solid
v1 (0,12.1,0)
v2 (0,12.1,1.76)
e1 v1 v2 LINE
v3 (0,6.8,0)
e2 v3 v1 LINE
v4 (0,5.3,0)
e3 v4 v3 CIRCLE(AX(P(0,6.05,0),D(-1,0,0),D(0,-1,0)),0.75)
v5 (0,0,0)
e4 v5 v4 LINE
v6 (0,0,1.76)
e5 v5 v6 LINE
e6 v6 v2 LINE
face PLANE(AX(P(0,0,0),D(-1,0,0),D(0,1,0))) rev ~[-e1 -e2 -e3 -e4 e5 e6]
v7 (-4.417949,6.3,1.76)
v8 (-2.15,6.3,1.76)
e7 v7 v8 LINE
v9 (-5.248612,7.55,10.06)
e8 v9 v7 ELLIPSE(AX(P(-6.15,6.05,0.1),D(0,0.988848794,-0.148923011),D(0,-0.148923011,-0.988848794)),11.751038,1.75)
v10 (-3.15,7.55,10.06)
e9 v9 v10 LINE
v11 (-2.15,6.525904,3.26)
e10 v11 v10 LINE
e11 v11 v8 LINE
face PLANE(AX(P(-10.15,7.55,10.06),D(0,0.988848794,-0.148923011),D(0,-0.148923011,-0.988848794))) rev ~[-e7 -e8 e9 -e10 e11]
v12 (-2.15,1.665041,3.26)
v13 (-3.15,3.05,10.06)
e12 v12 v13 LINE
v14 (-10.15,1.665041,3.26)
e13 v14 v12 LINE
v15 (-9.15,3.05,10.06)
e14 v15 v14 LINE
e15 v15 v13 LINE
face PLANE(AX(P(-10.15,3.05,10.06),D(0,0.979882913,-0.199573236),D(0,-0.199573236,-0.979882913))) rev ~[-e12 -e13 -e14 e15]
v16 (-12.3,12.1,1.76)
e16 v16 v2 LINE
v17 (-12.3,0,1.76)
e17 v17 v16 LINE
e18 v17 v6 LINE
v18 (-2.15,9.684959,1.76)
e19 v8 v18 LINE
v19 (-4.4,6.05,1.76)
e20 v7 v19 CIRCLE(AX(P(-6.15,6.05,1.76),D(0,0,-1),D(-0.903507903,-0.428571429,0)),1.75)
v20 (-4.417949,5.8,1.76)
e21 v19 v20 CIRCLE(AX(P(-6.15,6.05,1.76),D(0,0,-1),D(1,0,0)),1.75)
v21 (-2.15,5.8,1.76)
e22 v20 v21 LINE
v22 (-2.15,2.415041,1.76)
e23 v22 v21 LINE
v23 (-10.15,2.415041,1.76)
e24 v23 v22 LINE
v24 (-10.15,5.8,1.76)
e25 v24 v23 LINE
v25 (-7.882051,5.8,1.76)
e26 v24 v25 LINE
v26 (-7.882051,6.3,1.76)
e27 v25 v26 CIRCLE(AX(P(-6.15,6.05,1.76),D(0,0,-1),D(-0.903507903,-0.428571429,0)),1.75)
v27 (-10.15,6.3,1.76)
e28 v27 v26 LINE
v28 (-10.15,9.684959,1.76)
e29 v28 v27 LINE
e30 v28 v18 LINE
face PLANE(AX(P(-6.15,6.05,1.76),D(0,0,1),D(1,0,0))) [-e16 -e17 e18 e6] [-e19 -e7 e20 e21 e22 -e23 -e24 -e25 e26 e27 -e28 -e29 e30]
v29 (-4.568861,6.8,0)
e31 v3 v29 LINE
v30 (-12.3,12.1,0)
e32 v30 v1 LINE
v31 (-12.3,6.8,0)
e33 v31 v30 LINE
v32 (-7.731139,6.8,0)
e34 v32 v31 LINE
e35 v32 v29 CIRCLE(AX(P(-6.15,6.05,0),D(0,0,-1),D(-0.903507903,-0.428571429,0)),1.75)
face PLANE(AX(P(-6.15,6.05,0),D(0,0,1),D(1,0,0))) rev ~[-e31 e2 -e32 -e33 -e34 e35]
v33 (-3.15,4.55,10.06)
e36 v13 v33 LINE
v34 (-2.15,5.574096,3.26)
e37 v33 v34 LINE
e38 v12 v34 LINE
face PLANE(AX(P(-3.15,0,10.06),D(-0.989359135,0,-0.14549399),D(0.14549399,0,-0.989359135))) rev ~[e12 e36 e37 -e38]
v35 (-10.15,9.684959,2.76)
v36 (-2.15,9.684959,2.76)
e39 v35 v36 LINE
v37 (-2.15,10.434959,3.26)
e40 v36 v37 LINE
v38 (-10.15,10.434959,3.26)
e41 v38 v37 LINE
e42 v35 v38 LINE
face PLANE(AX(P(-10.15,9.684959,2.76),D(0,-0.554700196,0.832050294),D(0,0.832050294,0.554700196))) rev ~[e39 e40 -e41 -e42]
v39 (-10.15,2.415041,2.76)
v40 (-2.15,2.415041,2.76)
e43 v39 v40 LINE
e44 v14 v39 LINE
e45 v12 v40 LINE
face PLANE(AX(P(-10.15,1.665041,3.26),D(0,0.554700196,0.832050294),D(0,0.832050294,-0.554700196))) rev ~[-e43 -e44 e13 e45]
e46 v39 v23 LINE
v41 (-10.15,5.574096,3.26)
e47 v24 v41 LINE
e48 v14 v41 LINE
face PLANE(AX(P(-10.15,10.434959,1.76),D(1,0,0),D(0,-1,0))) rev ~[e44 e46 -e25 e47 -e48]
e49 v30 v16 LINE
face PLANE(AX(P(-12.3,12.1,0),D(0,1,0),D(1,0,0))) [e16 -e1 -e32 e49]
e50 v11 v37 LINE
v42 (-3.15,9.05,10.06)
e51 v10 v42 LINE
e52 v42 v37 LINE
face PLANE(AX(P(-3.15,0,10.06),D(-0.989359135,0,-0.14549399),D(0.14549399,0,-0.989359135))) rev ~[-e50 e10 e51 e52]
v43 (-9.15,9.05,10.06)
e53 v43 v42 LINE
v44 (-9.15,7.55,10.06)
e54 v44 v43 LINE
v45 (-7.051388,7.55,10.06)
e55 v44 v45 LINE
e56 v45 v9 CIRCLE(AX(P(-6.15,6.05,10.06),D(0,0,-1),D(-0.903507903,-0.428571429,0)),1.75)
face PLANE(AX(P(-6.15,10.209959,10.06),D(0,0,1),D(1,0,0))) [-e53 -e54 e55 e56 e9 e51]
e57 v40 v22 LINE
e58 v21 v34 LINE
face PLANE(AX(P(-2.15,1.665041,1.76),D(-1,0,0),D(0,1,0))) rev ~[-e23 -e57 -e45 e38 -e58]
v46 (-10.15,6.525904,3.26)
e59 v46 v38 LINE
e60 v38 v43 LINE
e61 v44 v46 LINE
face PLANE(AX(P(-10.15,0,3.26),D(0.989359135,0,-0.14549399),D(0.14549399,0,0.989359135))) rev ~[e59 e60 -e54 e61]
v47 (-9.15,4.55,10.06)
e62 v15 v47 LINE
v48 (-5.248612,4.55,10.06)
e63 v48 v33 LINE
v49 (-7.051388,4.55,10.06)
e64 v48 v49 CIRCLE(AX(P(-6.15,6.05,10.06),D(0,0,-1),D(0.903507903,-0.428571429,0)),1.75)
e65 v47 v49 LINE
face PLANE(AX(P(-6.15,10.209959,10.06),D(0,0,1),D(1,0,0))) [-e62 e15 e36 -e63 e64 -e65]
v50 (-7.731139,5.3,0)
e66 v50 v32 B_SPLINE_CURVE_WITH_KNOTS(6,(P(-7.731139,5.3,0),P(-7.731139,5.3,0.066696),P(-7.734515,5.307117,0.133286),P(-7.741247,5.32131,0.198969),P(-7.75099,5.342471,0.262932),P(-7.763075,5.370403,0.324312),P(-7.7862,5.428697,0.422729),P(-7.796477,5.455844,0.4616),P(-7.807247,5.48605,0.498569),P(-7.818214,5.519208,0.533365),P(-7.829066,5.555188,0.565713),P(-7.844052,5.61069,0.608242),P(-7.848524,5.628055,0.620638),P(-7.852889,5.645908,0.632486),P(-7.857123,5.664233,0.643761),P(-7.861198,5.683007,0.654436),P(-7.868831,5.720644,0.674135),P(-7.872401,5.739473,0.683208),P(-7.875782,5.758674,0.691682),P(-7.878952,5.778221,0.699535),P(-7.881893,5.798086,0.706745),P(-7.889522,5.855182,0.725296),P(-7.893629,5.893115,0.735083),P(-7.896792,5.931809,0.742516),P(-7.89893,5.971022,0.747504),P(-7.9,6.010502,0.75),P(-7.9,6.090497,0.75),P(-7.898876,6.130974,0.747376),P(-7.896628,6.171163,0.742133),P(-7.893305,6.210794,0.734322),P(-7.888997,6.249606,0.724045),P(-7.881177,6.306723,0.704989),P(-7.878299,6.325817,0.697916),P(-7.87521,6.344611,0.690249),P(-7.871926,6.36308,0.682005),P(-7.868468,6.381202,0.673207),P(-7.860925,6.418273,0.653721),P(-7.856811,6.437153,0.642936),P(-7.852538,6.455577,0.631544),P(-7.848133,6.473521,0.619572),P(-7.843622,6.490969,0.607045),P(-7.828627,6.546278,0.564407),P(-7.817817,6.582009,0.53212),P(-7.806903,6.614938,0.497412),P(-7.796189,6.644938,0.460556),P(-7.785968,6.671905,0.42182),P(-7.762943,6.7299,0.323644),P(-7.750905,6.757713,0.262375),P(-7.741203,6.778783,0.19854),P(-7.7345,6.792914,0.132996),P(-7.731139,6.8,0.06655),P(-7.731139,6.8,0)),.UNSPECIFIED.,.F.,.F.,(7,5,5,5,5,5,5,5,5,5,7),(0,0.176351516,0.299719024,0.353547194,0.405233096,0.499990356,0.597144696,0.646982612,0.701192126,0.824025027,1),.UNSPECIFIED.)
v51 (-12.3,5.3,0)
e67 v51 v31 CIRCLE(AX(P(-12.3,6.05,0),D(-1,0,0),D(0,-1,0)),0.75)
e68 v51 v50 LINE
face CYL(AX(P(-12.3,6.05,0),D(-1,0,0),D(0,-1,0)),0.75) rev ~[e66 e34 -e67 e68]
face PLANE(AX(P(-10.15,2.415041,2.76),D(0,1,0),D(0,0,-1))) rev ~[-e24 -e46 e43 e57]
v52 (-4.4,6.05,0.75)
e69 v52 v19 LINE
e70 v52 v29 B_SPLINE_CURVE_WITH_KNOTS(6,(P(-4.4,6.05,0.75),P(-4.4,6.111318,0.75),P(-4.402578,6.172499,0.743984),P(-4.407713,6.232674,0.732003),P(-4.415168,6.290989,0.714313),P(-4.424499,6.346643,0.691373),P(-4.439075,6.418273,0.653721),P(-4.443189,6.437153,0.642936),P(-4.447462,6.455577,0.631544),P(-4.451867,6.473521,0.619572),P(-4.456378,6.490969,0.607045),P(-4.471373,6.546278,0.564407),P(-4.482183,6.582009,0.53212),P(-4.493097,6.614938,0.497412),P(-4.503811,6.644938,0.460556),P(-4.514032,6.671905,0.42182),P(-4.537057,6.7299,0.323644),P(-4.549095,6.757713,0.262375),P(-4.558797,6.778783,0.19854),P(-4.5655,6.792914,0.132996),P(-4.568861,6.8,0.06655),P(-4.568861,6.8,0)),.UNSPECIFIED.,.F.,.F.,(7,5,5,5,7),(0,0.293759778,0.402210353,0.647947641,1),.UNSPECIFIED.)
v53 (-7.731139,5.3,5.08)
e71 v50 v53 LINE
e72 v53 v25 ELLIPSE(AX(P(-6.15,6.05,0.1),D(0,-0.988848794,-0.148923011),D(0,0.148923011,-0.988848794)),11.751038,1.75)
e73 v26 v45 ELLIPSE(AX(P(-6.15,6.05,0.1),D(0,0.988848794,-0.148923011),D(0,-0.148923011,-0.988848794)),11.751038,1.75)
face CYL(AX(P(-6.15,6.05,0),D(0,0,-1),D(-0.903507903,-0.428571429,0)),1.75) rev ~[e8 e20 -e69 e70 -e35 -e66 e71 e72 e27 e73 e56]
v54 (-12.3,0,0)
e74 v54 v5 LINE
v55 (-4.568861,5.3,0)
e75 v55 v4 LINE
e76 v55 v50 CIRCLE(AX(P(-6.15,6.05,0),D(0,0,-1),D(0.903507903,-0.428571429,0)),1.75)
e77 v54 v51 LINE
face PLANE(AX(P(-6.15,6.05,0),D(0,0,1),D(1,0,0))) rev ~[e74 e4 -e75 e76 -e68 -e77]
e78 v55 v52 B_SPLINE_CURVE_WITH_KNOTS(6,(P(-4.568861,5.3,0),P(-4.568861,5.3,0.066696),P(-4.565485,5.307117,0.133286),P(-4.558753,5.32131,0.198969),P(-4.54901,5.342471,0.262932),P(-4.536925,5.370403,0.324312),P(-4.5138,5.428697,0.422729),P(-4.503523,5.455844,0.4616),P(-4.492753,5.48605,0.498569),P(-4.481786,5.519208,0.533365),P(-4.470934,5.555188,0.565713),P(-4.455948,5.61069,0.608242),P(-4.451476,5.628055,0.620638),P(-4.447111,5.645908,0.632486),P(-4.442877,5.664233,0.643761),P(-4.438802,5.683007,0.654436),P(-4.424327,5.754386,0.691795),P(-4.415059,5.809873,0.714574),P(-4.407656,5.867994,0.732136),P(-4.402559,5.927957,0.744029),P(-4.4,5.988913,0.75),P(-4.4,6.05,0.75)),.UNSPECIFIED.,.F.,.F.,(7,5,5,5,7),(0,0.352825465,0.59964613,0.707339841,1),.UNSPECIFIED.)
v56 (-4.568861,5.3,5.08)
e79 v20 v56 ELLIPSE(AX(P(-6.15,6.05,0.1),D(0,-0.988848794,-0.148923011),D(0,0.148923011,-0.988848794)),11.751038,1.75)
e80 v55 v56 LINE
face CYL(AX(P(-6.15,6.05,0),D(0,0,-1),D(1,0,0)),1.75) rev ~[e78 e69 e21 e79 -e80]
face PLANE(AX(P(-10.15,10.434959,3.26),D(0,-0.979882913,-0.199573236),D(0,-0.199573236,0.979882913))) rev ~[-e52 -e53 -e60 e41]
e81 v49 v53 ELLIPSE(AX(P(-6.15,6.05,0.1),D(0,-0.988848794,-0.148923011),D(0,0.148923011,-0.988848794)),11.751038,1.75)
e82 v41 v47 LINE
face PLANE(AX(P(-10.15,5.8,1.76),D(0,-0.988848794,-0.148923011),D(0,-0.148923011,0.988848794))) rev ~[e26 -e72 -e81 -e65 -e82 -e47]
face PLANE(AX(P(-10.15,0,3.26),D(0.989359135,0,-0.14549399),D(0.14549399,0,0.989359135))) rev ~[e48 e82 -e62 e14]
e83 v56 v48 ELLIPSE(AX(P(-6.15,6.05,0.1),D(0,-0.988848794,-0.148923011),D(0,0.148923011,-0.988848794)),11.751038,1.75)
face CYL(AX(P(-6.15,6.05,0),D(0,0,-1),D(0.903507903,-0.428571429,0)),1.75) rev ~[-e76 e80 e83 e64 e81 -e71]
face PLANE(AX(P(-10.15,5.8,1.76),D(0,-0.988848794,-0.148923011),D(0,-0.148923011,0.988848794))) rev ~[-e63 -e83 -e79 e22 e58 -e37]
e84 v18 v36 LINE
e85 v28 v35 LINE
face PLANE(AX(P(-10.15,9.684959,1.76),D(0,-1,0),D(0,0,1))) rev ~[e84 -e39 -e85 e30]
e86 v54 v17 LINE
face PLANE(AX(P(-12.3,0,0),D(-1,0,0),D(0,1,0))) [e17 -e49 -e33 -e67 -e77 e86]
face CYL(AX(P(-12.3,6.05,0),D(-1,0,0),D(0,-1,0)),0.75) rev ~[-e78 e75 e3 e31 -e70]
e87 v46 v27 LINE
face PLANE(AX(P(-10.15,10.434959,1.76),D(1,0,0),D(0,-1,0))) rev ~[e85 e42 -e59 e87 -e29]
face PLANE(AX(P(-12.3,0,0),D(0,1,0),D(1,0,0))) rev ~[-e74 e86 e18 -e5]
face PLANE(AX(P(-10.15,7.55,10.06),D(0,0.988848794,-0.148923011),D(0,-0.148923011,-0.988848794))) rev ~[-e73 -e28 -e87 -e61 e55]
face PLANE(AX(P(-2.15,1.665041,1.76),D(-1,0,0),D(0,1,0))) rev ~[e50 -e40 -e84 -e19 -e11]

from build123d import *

# Parameters (mm, degrees)
F0_W      = 12.3
F0_H      = 12.1
F1_DEPTH  = 1.76
F2_W      = 8
F2_H      = 0.45
F2_H_2    = 7.8699186992
F3_DEPTH  = 8.3
F5_DEPTH  = 10.151
F7_DEPTH  = 12.101
F9_DEPTH  = 12.301
F11_DEPTH = 10.061


with BuildPart() as f1:
    # F0 (on Top) → F1 (new body)
    with BuildSketch(Plane.XY):
        with Locations((-6.15, 6.05)):
            Rectangle(F0_W, F0_H)
    extrude(amount=F1_DEPTH)

    # F2 (on face) → F3 (join)
    with BuildSketch(Plane.XY.offset(1.76)):
        with Locations((-6.15, 10.2099593496)):
            Rectangle(F2_W, F2_H)
        with Locations((-6.15, 6.05)):
            Rectangle(F2_W, F2_H_2)
        with Locations((-6.15, 1.8900406504)):
            Rectangle(F2_W, F2_H)
    extrude(amount=F3_DEPTH)

    # F4 (on face) → F5 (cut, through all)
    with BuildSketch(Plane(origin=(-10.15, 0, 0), x_dir=(0, -1, 0), z_dir=(-1, 0, 0))):
        Polygon((-10.4349593496, 3.26), (-9.05, 10.06), (-10.4349593496, 10.06), align=None)
        Polygon((-4.55, 10.06), (-7.55, 10.06), (-6.3, 1.76), (-5.8, 1.76), align=None)
        Polygon((-1.6650406504, 10.06), (-3.05, 10.06), (-1.6650406504, 3.26), align=None)
        Polygon((-10.4349593496, 1.76), (-9.6849593496, 1.76), (-9.6849593496, 2.76), (-10.4349593496, 3.26), align=None)
        Polygon((-2.4150406504, 2.76), (-2.4150406504, 1.76), (-1.6650406504, 1.76), (-1.6650406504, 3.26), align=None)
    extrude(amount=-F5_DEPTH, mode=Mode.SUBTRACT)

    # F6 (on Front) → F7 (cut, through all)
    with BuildSketch(Plane.XZ):
        Polygon((-10.15, 10.06), (-10.15, 3.26), (-9.15, 10.06), align=None)
        Polygon((-3.15, 10.06), (-2.15, 3.26), (-2.15, 10.06), align=None)
    extrude(amount=-F7_DEPTH, mode=Mode.SUBTRACT)

    # F8 (on face) → F9 (cut, through all)
    with BuildSketch(Plane(origin=(-12.3, 0, 0), x_dir=(0, -1, 0), z_dir=(-1, 0, 0))):
        with BuildLine():
            ThreePointArc((-6.8, 0), (-6.05, -0.75), (-5.3, 0))
            Line((-5.3, 0), (-6.8, 0))
        make_face()
        with BuildLine():
            Line((-6.8, 0), (-5.3, 0))
            ThreePointArc((-5.3, 0), (-6.05, 0.75), (-6.8, 0))
        make_face()
    extrude(amount=-F9_DEPTH, mode=Mode.SUBTRACT)

    # F10 (on face) → F11 (cut, through all)
    with BuildSketch(Plane(origin=(0, 0, 0), x_dir=(1, 0, 0), z_dir=(0, 0, -1))):
        with BuildLine():
            ThreePointArc((-7.7311388301, -5.3), (-6.5343872054, -7.7572628609), (-4.4, -6.05))
            ThreePointArc((-4.4, -6.05), (-4.4427371391, -5.6656127946), (-4.5688611699, -5.3))
            Line((-4.5688611699, -5.3), (-7.7311388301, -5.3))
        make_face()
        with BuildLine():
            Line((-7.7311388301, -5.3), (-4.5688611699, -5.3))
            ThreePointArc((-4.5688611699, -5.3), (-6.15, -4.3), (-7.7311388301, -5.3))
        make_face()
    extrude(amount=-F11_DEPTH, mode=Mode.SUBTRACT)


solid = f1.part
